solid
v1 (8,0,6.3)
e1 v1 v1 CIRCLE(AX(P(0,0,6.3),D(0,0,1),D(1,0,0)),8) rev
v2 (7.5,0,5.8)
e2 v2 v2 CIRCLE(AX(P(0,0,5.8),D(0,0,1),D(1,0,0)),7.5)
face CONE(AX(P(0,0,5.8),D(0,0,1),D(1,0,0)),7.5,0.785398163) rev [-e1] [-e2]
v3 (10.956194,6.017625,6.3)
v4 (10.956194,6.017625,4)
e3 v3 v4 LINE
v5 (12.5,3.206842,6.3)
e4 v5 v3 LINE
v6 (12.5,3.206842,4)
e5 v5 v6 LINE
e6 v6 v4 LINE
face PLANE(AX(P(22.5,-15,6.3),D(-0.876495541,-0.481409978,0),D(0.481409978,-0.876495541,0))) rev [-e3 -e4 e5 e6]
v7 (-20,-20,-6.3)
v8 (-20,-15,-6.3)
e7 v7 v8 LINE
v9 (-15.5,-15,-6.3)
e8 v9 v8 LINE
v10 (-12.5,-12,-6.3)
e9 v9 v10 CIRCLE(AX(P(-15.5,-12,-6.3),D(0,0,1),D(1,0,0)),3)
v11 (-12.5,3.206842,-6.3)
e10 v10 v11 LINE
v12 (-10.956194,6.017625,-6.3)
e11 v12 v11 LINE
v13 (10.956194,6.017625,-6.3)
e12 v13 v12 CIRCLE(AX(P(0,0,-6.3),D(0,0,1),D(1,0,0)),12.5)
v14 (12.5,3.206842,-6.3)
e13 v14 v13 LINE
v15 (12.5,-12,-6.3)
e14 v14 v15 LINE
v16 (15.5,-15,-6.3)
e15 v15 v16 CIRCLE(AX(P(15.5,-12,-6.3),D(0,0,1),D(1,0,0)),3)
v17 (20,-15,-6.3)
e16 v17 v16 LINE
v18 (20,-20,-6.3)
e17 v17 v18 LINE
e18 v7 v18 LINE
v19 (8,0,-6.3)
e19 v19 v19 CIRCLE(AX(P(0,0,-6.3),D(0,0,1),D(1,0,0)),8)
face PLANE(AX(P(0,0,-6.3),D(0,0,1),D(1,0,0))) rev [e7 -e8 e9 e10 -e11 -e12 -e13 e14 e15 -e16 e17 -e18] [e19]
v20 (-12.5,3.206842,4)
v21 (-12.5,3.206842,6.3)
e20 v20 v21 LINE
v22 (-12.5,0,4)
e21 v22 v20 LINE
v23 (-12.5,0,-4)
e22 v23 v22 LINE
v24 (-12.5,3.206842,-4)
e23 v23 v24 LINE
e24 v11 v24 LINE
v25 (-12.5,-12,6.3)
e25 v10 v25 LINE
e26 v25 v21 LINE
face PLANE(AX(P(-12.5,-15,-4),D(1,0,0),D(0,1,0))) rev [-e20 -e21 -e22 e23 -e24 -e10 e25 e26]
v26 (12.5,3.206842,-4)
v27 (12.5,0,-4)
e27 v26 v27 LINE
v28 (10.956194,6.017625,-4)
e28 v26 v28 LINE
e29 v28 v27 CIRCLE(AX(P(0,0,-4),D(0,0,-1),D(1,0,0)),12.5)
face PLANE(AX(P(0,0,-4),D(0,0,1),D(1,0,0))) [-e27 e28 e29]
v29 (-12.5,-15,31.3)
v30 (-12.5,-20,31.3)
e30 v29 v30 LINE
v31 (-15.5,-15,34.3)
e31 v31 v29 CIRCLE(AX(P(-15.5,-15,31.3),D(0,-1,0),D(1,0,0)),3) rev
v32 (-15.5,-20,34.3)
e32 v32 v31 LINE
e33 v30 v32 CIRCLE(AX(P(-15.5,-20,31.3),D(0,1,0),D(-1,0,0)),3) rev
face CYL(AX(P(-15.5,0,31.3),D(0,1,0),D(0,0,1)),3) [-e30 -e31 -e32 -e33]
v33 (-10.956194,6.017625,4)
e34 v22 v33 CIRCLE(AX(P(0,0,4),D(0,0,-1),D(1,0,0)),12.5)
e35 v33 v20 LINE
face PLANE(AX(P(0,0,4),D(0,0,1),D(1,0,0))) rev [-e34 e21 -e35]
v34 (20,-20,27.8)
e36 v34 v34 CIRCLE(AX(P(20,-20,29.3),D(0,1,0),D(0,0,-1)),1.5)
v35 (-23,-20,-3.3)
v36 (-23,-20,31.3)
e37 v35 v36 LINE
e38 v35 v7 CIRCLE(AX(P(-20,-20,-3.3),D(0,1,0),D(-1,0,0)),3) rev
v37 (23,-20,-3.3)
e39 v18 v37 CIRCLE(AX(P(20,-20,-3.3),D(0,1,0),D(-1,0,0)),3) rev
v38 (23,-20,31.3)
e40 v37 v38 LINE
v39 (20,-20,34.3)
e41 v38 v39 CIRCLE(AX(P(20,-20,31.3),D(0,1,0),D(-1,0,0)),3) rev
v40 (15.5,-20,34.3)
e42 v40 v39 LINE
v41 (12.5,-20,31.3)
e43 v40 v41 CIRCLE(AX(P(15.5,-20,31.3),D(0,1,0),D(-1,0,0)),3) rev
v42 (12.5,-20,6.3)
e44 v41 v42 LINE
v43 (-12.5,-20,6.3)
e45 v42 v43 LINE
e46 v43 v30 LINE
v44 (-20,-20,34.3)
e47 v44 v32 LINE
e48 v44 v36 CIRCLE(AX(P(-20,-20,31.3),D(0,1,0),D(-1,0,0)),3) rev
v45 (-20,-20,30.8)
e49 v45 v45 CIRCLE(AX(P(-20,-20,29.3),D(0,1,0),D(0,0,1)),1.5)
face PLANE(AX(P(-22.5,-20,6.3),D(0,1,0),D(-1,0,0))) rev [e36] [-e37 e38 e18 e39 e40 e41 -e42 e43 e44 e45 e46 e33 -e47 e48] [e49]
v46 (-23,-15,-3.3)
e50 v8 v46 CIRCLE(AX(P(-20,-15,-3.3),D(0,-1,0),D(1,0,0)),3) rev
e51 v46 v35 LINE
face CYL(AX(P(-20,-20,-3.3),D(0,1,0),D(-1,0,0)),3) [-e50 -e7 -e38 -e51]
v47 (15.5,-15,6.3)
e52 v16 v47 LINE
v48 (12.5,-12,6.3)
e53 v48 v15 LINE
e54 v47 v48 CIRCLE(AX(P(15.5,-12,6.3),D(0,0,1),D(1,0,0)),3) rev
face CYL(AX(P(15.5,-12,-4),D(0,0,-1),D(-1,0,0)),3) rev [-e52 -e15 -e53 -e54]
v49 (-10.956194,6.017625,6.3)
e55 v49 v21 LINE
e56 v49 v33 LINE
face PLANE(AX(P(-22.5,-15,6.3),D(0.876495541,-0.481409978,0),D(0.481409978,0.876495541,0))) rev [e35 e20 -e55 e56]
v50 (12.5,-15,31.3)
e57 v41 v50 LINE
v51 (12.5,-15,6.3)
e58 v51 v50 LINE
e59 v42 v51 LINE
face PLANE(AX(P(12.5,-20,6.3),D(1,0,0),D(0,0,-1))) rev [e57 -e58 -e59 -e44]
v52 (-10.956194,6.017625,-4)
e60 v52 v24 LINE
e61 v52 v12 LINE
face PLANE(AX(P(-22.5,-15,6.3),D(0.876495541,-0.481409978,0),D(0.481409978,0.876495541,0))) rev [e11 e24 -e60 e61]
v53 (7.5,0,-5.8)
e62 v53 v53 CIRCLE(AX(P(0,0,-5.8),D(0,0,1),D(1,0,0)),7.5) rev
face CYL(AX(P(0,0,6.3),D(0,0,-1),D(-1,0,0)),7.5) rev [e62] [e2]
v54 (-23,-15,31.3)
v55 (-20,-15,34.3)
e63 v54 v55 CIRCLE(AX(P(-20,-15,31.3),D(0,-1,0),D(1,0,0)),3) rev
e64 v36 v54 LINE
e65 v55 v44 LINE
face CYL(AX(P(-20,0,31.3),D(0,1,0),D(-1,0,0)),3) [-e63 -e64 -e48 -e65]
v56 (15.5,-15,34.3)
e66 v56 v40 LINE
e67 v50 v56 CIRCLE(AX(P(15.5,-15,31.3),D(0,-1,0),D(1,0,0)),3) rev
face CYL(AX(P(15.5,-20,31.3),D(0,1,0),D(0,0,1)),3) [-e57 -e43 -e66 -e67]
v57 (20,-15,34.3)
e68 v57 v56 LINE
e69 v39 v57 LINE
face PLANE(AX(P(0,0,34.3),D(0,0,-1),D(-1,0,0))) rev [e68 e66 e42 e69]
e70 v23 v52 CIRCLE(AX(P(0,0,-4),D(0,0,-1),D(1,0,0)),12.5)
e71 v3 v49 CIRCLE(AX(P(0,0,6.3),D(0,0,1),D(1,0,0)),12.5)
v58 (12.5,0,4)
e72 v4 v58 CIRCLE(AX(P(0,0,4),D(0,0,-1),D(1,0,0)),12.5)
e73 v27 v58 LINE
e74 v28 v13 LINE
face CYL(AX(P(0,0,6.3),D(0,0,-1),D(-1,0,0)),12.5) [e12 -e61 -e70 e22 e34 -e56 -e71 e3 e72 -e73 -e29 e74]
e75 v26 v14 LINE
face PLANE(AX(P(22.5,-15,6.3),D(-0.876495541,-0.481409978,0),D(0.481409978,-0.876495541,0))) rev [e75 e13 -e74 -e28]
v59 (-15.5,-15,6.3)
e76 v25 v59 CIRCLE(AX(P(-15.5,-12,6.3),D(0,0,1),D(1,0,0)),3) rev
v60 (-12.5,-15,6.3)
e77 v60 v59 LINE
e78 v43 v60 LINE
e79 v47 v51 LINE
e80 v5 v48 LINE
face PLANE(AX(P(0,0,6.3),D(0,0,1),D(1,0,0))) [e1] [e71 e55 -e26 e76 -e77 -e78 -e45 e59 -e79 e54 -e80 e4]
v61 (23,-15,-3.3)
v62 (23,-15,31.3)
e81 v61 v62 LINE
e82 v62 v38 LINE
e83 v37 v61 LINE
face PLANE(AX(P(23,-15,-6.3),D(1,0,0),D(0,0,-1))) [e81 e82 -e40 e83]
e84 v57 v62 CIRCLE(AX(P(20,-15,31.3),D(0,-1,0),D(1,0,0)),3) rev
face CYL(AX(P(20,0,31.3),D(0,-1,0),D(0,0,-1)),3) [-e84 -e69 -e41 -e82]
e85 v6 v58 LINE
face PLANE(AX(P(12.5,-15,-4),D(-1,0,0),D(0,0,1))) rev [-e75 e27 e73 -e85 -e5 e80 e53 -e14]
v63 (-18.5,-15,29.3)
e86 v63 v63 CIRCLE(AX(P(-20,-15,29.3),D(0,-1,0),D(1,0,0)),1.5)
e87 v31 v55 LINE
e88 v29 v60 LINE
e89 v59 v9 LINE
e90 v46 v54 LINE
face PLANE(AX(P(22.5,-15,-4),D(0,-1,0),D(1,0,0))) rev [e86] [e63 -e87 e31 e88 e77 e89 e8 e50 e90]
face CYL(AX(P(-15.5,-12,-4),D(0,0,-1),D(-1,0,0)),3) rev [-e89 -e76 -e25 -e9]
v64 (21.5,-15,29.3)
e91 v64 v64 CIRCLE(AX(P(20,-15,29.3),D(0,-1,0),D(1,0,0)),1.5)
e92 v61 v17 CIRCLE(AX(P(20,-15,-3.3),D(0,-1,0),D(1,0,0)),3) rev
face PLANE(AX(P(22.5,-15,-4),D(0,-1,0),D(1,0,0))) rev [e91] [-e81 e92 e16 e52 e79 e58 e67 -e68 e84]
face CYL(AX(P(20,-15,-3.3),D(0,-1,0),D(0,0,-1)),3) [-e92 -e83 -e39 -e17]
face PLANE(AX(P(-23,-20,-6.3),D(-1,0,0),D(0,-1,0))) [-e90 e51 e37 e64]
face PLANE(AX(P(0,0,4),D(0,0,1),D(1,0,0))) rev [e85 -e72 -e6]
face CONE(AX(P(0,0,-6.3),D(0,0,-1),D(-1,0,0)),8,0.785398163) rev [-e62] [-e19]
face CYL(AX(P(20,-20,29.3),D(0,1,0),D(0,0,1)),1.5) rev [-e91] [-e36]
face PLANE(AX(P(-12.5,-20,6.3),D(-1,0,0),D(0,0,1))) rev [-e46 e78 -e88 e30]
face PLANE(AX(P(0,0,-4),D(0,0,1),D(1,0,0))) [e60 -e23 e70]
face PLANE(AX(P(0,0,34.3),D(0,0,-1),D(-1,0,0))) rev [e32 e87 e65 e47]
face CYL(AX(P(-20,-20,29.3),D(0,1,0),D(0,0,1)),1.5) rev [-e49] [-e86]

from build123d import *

# Parameters (mm, degrees)
SKETCH_1_R           = 7.5
EXTRUDE_1_DEPTH      = 6.3
CUT_EXTRUDE_1_DEPTH  = 4
SKETCH_3_R           = 2
CUT_EXTRUDE_2_DEPTH  = 41.027365639
CHAMFER_1_SIZE       = 0.5
EXTRUDE_2_DEPTH      = 28
EXTRUDE_2_DEPTH_BACK = 12.6
SKETCH_5_R           = 1.5
CUT_EXTRUDE_3_DEPTH  = 46.885618662
SKETCH_6_W           = 25
SKETCH_6_H           = 28
CUT_EXTRUDE_4_DEPTH  = 46.885618662
SKETCH_7_W           = 10
SKETCH_7_H           = 22.359066313
SKETCH_7_W_2         = 10.5
SKETCH_7_H_2         = 23.032343059
CUT_EXTRUDE_5_DEPTH  = 42.388404173
FILLET_1_R           = 3


with BuildPart() as part:
    # 草图1 → 凸台-拉伸1 (new, symmetric)
    with BuildSketch(Plane.XY):
        with BuildLine():
            Line((-22.5, -20), (22.5, -20))
            Line((22.5, -20), (22.5, -15))
            Line((22.5, -15), (10.956194261, 6.017624724))
            ThreePointArc((10.956194261, 6.017624724), (0, 12.5), (-10.956194261, 6.017624724))
            Line((-10.956194261, 6.017624724), (-22.5, -15))
            Line((-22.5, -15), (-22.5, -20))
        make_face()
        Circle(SKETCH_1_R, mode=Mode.SUBTRACT)
    extrude(amount=EXTRUDE_1_DEPTH, both=True)

    # 草图2 → 切除-拉伸1 (cut, symmetric)
    with BuildSketch(Plane.XY):
        with BuildLine():
            Line((22.5, -15), (12.5, -15))
            Line((12.5, -15), (12.5, 0))
            ThreePointArc((12.5, 0), (12.107898832, 3.106249486), (10.956194261, 6.017624724))
            Line((10.956194261, 6.017624724), (22.5, -15))
        make_face()
        with BuildLine():
            Line((-22.5, -15), (-12.5, -15))
            Line((-12.5, -15), (-12.5, 0))
            ThreePointArc((-12.5, 0), (-12.107898832, 3.106249486), (-10.956194261, 6.017624724))
            Line((-10.956194261, 6.017624724), (-22.5, -15))
        make_face()
    extrude(amount=CUT_EXTRUDE_1_DEPTH, both=True, mode=Mode.SUBTRACT)

    # 草图3 → 切除-拉伸2 (cut, through all)
    with BuildSketch(Plane.XZ.offset(20)):
        with Locations((17.5, 0)):
            Circle(SKETCH_3_R)
        with Locations((-17.5, 0)):
            Circle(SKETCH_3_R)
    extrude(amount=-CUT_EXTRUDE_2_DEPTH, mode=Mode.SUBTRACT)

    # 倒角1
    chamfer_1_edges = [part.edges().sort_by_distance(p)[0] for p in [
        (-7.5, 0, -6.3),
        (-7.5, 0, 6.3),
    ]]
    chamfer(chamfer_1_edges, length=CHAMFER_1_SIZE)

    # 草图4 → 凸台-拉伸2 (add, two sides: drawn at the far end of the back side and taken through both)
    with BuildSketch(Plane.XY.offset(6.3).offset(-EXTRUDE_2_DEPTH_BACK)):
        Polygon((-22.5, -15), (-23, -15), (-23, -20), (-22.5, -20), (23, -20), (23, -15), align=None)
    extrude(amount=EXTRUDE_2_DEPTH + EXTRUDE_2_DEPTH_BACK)

    # 草图5 → 切除-拉伸3 (cut, through all)
    with BuildSketch(Plane(origin=(0, 0, 0), x_dir=(1, 0, 0), z_dir=(0, 1, 0))):
        with Locations((-20, -29.3)):
            Circle(SKETCH_5_R)
        with Locations((20, -29.3)):
            Circle(SKETCH_5_R)
    extrude(amount=-CUT_EXTRUDE_3_DEPTH, mode=Mode.SUBTRACT)

    # 草图6 → 切除-拉伸4 (cut, through all)
    with BuildSketch(Plane(origin=(0, 0, 0), x_dir=(1, 0, 0), z_dir=(0, 1, 0))):
        with Locations((0, -20.3)):
            Rectangle(SKETCH_6_W, SKETCH_6_H)
    extrude(amount=-CUT_EXTRUDE_4_DEPTH, mode=Mode.SUBTRACT)

    # 草图7 → 切除-拉伸5 (cut, through all)
    with BuildSketch(Plane.XY.offset(6.3)):
        with Locations((-17.5, -3.820466844)):
            Rectangle(SKETCH_7_W, SKETCH_7_H)
        with Locations((17.75, -3.483828471)):
            Rectangle(SKETCH_7_W_2, SKETCH_7_H_2)
    extrude(amount=-CUT_EXTRUDE_5_DEPTH, mode=Mode.SUBTRACT)

    # 圆角1
    fillet_1_edges = [part.edges().sort_by_distance(p)[0] for p in [
        (-12.5, -15, 0),
        (12.5, -15, 0),
    ]]
    fillet(fillet_1_edges, radius=FILLET_1_R)
    fillet_1_2_edges = [part.edges().sort_by_distance(p)[0] for p in [
        (23, -17.5, -6.3),
        (-23, -17.5, -6.3),
        (-23, -17.5, 34.3),
        (-12.5, -17.5, 34.3),
        (12.5, -17.5, 34.3),
        (23, -17.5, 34.3),
    ]]
    fillet(fillet_1_2_edges, radius=FILLET_1_R)


solid = part.part
